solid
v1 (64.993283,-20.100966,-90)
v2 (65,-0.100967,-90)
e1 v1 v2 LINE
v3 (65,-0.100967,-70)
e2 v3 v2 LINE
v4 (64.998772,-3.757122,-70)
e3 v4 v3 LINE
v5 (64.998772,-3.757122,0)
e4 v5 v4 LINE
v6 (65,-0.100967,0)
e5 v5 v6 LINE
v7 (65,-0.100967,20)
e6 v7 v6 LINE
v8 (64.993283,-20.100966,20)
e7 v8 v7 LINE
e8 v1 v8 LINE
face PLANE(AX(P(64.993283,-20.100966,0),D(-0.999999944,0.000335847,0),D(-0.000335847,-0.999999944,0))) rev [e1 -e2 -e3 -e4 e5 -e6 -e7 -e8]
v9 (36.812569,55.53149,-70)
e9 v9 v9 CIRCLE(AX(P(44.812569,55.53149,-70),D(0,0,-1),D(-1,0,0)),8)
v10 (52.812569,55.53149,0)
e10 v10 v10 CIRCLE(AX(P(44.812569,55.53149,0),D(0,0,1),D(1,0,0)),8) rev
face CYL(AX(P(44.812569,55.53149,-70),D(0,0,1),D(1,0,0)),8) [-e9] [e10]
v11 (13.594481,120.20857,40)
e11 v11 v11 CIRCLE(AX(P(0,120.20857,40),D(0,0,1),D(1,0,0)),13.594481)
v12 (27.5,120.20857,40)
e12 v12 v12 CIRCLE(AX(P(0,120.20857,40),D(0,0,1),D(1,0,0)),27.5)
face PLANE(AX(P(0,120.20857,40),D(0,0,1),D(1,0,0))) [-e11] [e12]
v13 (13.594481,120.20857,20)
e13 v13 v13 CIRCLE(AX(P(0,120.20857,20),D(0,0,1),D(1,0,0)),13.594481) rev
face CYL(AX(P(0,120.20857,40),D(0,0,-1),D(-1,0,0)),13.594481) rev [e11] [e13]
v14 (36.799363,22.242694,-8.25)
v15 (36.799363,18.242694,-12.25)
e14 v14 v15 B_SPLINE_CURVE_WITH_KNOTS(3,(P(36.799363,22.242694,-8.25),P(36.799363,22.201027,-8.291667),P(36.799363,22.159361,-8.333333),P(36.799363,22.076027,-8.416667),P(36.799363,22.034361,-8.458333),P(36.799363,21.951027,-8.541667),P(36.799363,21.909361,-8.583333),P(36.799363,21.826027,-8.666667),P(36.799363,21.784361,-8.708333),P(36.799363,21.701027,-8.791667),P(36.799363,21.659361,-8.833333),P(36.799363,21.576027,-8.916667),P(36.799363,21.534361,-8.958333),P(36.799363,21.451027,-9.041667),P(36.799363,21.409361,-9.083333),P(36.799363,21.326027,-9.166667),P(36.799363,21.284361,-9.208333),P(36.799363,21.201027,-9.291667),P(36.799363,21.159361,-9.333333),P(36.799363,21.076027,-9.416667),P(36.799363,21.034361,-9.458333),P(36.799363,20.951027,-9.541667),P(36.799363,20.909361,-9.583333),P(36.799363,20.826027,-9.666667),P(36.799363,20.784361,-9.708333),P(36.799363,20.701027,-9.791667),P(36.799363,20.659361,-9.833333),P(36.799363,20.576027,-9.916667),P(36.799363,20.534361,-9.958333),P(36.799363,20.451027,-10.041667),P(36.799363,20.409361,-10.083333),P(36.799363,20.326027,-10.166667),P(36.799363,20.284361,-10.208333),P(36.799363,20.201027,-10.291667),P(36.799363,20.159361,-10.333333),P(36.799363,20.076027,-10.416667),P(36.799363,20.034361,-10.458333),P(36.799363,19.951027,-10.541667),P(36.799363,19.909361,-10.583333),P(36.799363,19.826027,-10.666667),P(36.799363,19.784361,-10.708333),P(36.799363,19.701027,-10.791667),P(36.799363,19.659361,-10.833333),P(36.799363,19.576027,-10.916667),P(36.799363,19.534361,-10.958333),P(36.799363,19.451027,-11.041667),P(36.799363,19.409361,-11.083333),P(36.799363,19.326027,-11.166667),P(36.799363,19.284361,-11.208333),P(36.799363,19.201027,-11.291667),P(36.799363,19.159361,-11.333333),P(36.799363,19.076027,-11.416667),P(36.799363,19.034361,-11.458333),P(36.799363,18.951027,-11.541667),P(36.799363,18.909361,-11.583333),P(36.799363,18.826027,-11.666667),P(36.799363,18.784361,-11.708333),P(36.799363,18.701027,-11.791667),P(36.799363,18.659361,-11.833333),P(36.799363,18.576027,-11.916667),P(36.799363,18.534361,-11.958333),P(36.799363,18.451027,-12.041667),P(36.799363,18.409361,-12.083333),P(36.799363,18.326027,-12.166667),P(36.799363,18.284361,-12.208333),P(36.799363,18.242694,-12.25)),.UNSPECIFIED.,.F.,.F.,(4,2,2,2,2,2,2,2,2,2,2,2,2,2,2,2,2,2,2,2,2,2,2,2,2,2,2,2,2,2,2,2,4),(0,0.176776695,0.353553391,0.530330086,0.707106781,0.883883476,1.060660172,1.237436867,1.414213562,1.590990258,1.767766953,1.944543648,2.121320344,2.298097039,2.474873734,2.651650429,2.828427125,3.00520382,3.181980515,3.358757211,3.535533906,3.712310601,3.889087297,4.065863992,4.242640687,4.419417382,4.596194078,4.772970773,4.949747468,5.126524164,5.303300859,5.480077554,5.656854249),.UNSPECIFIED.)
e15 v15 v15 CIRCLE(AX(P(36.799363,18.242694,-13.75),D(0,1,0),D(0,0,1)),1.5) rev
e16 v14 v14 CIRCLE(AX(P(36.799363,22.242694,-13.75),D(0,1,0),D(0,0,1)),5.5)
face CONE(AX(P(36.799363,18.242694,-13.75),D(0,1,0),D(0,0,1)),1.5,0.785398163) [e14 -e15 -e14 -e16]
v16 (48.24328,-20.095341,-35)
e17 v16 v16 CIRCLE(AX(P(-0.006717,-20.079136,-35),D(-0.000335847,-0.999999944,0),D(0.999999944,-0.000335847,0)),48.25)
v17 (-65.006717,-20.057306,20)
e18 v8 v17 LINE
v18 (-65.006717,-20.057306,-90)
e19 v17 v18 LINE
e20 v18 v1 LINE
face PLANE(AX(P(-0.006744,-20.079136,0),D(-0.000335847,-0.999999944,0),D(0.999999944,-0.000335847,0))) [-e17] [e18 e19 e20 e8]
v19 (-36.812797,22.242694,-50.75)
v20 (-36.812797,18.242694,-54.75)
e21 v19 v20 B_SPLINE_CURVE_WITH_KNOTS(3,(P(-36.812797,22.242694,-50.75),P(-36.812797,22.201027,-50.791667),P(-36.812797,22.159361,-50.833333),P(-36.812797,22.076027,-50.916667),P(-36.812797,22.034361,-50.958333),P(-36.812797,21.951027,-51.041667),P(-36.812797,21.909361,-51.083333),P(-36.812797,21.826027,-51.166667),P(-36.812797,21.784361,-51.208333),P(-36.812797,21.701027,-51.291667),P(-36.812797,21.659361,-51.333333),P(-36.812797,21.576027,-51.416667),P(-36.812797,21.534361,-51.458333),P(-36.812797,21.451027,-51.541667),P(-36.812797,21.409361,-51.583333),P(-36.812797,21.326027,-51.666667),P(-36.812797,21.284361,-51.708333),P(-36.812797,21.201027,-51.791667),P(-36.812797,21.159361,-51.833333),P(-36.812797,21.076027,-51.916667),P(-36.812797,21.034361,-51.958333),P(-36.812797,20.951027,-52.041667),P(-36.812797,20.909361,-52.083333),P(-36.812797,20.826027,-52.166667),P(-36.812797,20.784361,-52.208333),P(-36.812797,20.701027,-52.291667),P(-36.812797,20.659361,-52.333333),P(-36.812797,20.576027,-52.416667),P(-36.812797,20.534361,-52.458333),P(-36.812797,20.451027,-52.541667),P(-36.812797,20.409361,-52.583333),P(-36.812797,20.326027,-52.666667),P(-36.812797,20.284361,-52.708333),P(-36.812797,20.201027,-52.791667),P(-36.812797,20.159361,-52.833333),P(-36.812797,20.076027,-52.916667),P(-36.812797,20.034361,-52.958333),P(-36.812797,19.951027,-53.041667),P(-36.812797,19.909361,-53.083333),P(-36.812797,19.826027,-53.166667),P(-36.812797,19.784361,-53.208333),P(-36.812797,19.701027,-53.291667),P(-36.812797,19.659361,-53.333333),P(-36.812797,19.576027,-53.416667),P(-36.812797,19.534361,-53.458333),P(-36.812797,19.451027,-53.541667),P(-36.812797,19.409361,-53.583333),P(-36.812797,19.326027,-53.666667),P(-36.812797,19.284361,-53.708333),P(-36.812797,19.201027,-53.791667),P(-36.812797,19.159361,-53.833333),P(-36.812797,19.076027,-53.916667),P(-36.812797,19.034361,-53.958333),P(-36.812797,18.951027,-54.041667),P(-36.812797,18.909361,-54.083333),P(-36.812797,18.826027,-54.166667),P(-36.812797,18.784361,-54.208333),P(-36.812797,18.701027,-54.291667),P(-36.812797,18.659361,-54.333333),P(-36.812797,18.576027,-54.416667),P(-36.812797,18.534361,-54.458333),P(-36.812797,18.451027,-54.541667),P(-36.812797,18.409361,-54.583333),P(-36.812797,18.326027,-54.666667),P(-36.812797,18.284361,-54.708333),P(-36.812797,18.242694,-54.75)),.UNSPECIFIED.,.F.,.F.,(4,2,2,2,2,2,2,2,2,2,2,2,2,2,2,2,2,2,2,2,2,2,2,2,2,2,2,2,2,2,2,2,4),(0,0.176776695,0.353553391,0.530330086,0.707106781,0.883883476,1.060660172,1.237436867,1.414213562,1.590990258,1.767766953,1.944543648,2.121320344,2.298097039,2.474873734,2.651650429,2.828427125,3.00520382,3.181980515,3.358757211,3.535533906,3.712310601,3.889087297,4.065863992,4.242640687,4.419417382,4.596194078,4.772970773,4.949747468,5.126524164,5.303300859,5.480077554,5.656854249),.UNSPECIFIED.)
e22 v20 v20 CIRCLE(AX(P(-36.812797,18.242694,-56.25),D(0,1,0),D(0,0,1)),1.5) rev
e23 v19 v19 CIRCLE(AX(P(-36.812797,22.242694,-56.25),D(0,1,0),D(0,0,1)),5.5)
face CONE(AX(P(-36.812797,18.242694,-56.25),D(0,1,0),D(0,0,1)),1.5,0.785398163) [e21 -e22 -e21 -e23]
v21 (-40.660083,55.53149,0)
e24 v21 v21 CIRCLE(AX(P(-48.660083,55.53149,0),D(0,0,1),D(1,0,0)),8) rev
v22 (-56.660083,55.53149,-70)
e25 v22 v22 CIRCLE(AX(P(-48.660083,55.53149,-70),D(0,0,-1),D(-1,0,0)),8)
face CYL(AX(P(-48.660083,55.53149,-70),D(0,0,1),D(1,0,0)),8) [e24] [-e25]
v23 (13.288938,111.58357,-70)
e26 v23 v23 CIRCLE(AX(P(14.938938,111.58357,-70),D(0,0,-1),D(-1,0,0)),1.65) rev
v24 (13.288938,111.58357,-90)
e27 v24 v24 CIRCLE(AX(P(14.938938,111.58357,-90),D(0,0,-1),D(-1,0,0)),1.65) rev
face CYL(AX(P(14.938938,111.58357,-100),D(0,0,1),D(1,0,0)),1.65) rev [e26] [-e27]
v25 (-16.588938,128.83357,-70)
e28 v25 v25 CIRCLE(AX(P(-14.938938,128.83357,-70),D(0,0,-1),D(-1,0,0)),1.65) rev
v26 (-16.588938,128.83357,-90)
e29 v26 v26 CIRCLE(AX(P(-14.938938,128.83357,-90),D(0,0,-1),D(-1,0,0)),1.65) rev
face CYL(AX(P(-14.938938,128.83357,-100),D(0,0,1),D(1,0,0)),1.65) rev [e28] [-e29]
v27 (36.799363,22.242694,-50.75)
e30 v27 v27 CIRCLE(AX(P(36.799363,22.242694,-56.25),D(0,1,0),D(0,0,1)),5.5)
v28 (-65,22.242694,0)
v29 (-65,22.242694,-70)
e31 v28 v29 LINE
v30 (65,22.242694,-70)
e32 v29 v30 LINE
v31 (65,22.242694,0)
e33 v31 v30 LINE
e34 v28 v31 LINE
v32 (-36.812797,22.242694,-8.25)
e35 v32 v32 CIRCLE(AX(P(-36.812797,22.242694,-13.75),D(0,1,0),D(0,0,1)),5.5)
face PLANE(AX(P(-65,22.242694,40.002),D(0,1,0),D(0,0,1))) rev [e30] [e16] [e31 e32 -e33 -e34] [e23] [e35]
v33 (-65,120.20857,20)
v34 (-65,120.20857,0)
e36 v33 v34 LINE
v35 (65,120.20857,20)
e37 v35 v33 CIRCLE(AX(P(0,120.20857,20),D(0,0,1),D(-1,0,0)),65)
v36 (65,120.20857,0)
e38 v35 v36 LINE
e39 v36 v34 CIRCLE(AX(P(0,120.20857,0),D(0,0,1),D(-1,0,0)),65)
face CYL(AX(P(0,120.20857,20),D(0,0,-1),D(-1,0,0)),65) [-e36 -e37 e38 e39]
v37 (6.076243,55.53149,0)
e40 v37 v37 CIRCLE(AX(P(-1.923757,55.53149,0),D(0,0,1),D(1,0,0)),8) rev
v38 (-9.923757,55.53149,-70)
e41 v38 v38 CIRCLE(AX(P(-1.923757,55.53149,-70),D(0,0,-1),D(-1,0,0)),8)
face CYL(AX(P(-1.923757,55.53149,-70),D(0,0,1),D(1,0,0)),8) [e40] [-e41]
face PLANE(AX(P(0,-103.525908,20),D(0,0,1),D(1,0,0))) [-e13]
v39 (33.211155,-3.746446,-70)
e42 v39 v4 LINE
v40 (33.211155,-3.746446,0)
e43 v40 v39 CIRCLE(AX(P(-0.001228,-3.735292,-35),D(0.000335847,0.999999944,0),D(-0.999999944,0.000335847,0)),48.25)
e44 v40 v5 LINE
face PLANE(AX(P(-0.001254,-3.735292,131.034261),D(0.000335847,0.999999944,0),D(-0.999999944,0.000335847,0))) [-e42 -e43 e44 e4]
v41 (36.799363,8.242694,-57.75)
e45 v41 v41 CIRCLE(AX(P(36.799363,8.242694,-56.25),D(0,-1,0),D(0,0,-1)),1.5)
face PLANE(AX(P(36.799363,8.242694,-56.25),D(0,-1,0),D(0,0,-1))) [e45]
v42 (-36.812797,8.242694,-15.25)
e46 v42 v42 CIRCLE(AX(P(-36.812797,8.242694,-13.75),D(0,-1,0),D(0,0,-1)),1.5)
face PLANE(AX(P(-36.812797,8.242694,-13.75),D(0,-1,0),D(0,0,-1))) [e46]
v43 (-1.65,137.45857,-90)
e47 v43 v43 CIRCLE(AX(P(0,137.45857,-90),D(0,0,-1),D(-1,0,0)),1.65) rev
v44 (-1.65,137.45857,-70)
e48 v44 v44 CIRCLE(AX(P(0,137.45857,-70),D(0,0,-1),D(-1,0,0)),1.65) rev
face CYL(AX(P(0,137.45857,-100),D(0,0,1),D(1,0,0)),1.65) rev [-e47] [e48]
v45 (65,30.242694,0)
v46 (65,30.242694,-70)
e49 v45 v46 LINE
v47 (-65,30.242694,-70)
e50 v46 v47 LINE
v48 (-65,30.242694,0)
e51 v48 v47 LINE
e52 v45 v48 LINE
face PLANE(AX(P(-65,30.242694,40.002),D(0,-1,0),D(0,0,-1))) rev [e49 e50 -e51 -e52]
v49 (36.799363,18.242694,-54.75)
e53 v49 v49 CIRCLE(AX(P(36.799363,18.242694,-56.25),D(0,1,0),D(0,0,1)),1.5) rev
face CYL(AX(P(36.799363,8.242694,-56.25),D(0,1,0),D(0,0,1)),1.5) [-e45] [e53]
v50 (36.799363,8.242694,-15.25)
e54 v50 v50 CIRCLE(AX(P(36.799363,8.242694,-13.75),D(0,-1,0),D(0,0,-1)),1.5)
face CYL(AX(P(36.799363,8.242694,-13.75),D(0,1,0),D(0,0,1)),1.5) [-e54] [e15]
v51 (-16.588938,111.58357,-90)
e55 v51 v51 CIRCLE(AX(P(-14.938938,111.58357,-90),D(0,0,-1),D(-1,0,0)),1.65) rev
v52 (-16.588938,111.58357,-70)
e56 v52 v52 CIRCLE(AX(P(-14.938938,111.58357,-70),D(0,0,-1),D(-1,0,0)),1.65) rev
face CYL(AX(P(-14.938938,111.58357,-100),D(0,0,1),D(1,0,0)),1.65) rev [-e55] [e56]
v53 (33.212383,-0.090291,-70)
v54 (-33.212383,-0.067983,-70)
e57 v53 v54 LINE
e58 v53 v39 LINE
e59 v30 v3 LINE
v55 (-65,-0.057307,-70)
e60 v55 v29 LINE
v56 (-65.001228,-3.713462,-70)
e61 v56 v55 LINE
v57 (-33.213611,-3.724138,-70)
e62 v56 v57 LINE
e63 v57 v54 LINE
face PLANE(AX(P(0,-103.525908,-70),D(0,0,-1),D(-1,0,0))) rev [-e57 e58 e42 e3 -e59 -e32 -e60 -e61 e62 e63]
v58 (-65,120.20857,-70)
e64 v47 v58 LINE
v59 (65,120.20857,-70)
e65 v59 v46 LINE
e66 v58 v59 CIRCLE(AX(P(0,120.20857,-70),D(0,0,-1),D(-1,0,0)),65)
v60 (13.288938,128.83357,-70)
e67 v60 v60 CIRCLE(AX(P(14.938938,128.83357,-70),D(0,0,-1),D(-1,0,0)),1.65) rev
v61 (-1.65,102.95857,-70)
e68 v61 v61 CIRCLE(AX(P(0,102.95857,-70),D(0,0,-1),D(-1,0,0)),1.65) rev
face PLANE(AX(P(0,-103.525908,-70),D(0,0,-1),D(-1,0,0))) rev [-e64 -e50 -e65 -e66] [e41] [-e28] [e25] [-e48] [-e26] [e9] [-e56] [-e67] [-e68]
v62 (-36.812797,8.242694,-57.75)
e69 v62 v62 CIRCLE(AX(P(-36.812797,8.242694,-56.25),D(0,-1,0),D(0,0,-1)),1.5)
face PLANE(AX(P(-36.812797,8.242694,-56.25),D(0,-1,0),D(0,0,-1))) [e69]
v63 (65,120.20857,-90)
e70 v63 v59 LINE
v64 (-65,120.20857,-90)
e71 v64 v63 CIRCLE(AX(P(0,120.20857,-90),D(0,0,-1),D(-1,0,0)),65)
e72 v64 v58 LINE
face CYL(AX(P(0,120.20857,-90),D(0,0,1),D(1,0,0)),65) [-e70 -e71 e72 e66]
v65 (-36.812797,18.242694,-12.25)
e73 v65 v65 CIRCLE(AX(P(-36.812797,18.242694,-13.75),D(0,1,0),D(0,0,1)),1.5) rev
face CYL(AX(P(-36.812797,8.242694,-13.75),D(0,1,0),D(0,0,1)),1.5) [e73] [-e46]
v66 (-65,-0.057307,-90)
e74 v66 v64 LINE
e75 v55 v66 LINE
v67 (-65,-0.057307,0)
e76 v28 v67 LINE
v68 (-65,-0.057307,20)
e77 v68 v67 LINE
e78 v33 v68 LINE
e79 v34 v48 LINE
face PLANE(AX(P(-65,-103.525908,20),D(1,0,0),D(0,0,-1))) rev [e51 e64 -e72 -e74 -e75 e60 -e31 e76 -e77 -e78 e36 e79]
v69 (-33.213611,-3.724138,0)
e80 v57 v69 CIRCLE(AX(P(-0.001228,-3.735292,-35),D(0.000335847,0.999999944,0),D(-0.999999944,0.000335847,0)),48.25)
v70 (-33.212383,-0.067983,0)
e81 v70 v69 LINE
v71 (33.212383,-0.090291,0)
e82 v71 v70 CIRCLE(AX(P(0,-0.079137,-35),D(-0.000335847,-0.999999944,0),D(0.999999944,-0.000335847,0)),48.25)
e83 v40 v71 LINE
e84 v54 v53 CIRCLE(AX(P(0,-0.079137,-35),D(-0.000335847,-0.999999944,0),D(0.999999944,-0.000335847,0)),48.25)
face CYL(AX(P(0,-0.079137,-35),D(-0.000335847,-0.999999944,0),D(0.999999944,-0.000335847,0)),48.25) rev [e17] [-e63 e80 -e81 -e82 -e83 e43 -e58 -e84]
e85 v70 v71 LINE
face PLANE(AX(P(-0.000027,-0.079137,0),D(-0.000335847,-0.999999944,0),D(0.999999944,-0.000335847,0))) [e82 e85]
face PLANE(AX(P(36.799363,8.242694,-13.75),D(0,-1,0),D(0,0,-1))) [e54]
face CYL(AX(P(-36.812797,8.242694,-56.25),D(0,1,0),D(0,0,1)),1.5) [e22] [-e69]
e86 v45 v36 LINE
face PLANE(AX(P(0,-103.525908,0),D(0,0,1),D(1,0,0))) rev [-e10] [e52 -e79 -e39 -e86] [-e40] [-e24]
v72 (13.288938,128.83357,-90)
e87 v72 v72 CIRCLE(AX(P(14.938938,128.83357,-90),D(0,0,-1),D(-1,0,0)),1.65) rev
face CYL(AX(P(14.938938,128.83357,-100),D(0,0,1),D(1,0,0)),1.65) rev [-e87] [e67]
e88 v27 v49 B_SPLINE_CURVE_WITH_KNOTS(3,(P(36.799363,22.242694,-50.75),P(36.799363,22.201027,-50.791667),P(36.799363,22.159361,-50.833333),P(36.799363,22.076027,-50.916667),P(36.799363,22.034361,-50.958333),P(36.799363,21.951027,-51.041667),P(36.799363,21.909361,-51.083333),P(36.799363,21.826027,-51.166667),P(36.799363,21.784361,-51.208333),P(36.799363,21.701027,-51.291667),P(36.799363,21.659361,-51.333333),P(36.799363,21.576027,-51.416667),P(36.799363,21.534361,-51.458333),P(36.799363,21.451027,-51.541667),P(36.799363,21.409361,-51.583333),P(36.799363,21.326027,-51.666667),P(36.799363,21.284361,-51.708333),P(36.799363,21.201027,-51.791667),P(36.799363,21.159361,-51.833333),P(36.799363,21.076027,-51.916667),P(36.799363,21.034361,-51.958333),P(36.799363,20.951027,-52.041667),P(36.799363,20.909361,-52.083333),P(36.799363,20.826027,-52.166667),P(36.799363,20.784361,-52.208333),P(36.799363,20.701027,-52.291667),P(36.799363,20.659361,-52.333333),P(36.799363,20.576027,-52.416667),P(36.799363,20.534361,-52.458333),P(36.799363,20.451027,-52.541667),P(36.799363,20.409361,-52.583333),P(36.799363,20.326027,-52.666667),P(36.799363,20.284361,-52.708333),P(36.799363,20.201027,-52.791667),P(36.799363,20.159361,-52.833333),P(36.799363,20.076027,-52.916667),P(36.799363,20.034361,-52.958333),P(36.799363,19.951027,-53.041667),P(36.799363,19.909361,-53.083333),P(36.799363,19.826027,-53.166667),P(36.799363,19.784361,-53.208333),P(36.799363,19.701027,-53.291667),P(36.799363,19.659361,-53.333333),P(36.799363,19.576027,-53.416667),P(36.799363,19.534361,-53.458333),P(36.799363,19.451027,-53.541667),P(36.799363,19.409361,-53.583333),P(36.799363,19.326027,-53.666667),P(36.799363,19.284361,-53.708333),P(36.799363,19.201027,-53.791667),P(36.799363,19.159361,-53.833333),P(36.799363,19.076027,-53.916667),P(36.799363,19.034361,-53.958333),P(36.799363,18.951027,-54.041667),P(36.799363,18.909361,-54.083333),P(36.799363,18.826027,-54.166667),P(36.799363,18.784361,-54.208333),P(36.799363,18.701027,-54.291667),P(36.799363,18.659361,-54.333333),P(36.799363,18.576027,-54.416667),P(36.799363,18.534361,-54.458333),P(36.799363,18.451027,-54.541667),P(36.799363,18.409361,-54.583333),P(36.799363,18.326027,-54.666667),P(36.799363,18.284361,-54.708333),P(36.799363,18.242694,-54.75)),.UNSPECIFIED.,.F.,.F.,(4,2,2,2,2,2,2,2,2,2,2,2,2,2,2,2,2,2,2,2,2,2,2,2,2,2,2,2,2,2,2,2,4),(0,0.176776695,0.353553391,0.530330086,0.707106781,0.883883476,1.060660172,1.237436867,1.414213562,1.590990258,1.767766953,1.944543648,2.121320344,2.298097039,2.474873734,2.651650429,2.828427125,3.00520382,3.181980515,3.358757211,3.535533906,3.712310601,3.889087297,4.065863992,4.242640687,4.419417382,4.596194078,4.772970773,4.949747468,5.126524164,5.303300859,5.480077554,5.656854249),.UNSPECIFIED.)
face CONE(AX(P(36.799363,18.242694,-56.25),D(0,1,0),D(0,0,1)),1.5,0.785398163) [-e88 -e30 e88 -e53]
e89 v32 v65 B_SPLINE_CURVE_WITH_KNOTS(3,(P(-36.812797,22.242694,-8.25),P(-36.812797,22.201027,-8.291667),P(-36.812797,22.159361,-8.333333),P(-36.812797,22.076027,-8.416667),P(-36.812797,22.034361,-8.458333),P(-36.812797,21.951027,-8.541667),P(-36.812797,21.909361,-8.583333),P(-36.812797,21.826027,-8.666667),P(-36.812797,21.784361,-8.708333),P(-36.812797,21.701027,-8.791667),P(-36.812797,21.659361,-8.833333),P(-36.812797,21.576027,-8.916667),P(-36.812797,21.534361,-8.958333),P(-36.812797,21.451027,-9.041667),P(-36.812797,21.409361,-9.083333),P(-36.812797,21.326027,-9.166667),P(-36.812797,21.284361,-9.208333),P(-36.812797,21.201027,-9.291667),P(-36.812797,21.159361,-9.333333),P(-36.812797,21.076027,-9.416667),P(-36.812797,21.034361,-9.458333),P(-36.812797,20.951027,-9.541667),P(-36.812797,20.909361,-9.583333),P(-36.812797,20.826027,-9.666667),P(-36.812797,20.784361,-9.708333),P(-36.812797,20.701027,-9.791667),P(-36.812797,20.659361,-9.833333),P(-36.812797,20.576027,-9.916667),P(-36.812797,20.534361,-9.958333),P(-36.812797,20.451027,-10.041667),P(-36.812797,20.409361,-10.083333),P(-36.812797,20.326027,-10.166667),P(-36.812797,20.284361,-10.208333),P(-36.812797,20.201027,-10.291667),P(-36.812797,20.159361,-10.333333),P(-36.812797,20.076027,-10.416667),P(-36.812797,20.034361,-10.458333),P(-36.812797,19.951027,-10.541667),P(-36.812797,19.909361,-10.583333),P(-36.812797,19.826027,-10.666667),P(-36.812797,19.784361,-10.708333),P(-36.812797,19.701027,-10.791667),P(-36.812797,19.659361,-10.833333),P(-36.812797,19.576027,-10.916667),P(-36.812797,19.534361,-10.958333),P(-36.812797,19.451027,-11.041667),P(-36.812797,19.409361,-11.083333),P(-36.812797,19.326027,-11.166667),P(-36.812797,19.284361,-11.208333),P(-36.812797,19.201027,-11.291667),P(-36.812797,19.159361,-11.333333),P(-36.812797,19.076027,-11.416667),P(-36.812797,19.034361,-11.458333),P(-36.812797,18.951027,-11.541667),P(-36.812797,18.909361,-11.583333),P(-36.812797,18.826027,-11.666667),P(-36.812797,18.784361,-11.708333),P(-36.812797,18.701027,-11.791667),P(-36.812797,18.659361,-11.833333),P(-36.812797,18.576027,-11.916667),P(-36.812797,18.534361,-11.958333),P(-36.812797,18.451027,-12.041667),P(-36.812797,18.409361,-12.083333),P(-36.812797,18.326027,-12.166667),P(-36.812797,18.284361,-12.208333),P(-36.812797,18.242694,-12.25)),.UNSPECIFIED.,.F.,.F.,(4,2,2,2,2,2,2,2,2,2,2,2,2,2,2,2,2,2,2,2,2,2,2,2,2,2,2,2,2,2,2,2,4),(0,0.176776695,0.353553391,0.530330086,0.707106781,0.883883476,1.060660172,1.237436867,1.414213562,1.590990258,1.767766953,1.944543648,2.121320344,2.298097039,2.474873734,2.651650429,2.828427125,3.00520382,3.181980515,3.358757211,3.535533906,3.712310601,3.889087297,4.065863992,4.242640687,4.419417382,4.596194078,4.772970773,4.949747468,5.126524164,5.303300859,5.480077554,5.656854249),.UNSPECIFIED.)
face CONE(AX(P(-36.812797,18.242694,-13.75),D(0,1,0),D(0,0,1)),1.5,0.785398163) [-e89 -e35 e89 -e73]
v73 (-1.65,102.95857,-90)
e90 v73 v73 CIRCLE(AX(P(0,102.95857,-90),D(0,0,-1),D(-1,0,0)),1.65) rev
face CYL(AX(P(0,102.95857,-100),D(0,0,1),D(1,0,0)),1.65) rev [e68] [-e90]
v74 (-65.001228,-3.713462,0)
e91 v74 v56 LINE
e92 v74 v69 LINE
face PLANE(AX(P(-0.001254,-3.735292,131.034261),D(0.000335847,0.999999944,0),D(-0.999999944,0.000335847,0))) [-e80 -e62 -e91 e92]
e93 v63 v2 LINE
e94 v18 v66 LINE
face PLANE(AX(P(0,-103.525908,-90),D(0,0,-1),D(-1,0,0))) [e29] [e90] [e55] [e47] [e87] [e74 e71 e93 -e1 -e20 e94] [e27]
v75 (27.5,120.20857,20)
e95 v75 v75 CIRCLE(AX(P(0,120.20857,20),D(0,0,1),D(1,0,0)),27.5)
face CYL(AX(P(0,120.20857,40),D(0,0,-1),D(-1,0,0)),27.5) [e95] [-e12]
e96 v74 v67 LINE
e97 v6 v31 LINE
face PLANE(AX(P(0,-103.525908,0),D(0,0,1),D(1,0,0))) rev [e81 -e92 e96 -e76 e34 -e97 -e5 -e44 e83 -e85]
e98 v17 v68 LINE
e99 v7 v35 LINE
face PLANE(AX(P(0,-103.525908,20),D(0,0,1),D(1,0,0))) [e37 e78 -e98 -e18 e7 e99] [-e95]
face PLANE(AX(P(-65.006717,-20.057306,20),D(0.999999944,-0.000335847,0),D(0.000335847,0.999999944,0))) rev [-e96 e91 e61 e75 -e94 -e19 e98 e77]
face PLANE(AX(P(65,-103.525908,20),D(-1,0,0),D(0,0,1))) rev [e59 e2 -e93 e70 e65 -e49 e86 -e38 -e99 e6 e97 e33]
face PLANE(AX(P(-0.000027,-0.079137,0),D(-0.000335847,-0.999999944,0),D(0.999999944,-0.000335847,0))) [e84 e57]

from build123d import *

# Parameters (mm, degrees)
SKETCH_1_R                      = 48.25
EXTRUDE_1_DEPTH                 = 20
SKETCH_2_R                      = 8
EXTRUDE_2_DEPTH                 = 70
EXTRUDE_START                   = 20
SKETCH_3_R                      = 48.25
EXTRUDE_3_DEPTH                 = 20
EXTRUDE_4_DEPTH                 = 149
EXTRUDE_START_2                 = -120.265870341
EXTRUDE_4_2_OUTLINE_W           = 1.999969756
EXTRUDE_4_2_OUTLINE_H           = 20
EXTRUDE_4_2_DEPTH               = 140.265870341
EXTRUDE_4_3_OUTLINE_W           = 130.000007332
EXTRUDE_4_3_OUTLINE_H           = 20
EXTRUDE_4_3_DEPTH               = 20
EXTRUDE_6_DEPTH                 = 70
CUT_EXTRUDE_3_DEPTH             = 20
EXTRUDE_START_3                 = -20
SKETCH_8_R                      = 48.25
EXTRUDE_7_DEPTH                 = 20
SKETCH_9_R                      = 48.25
EXTRUDE_8_DEPTH                 = 20
SKETCH_10_R                     = 1.65
EXTRUDE_9_DEPTH                 = 10
EXTRUDE_START_4                 = 10
SKETCH_11_R                     = 1.65
EXTRUDE_10_DEPTH                = 10
SKETCH_14_R                     = 27.5
SKETCH_14_R_2                   = 13.594481218
EXTRUDE_12_DEPTH                = 20
CUT_EXTRUDE_4_REACH             = 237.432
SKETCH_15_R                     = 1.65
CUT_EXTRUDE_4_DIRECTION_2_DEPTH = 236.431704876
EXTRUDE_13_REACH                = 227.007
SKETCH_16_W                     = 130
SKETCH_16_H                     = 8
CUT_EXTRUDE_START               = 70
SKETCH_17_R                     = 8
CUT_EXTRUDE_5_DEPTH             = 70
SKETCH_18_R                     = 1.5
EXTRUDE_14_DEPTH                = 14
CHAMFER_1_SIZE                  = 4


with BuildPart() as part:
    # 草图1 → 凸台-拉伸1 (new body)
    with BuildSketch(Plane.XY):
        with BuildLine():
            Line((-65, -103.52590801), (-65, 120.208570031))
            ThreePointArc((-65, 120.208570031), (0, 185.208570031), (65, 120.208570031))
            Line((65, 120.208570031), (65, -103.52590801))
            ThreePointArc((65, -103.52590801), (0, -168.52590801), (-65, -103.52590801))
        make_face()
        with Locations((0, 120.208570031)):
            Circle(SKETCH_1_R, mode=Mode.SUBTRACT)
        with Locations(Location((0, -103.52590801, 0), (0, 0, 180))):
            Circle(SKETCH_1_R, mode=Mode.SUBTRACT)
    extrude(amount=EXTRUDE_1_DEPTH)

    # 草图2 → 凸台-拉伸2 (add)
    with BuildSketch(Plane(origin=(0, 0, 0), x_dir=(-1, 0, 0), z_dir=(0, 0, -1))):
        with Locations(Location((-44.812568829, 55.531490167, 0), (0, 0, 180))):
            Circle(SKETCH_2_R)
        with Locations(Location((-44.812568829, -39.65707978, 0), (0, 0, 180))):
            Circle(SKETCH_2_R)
        with Locations(Location((48.660082913, -39.65707978, 0), (0, 0, 180))):
            Circle(SKETCH_2_R)
        with Locations(Location((48.660082913, 55.531490167, 0), (0, 0, 180))):
            Circle(SKETCH_2_R)
        with Locations(Location((1.923757042, 55.531490167, 0), (0, 0, 180))):
            Circle(SKETCH_2_R)
        with Locations(Location((1.923757042, -39.65707978, 0), (0, 0, 180))):
            Circle(SKETCH_2_R)
        with Locations(Location((-44.812568829, 7.937205194, 0), (0, 0, 180))):
            Circle(SKETCH_2_R)
        with Locations(Location((48.660082913, 7.937205194, 0), (0, 0, 180))):
            Circle(SKETCH_2_R)
    extrude(amount=EXTRUDE_2_DEPTH)

    # 草图3 → 凸台-拉伸3 (add)
    with BuildSketch(Plane(origin=(0, 0, -70), x_dir=(-1, 0, 0), z_dir=(0, 0, -1)).offset(EXTRUDE_START)):
        with BuildLine():
            Line((65, -103.52590801), (65, 120.208570031))
            ThreePointArc((65, 120.208570031), (0, 185.208570031), (-65, 120.208570031))
            Line((-65, 120.208570031), (-65, -103.52590801))
            ThreePointArc((-65, -103.52590801), (0, -168.52590801), (65, -103.52590801))
        make_face()
        with Locations(Location((0, 120.208570031, 0), (0, 0, 180))):
            Circle(SKETCH_3_R, mode=Mode.SUBTRACT)
        with Locations((0, -103.52590801)):
            Circle(SKETCH_3_R, mode=Mode.SUBTRACT)
    extrude(amount=-EXTRUDE_3_DEPTH)

    # 凸台-拉伸4: read off the stored shape, not the designer's step
    # 凸台-拉伸4 outline → 凸台-拉伸4 (cut)
    with BuildSketch(Plane(origin=(-2.6578e-05, -0.079137147, 0), x_dir=(0.9999999436033571, -0.0003358471121103656, 0), z_dir=(-0.0003358471121103656, -0.9999999436033572, 0)).offset(EXTRUDE_START)):
        Polygon((-64.999977088, 20), (-64.999977088, -90), (67, -90), (67, -70), (65.000030244, -70), (65.000030244, 0), (67, 0), (67, 20), align=None)
    extrude(amount=EXTRUDE_4_DEPTH, mode=Mode.SUBTRACT)

    # Extrude 4 2 outline → Extrude 4 2 (cut)
    with BuildSketch(Plane(origin=(-2.6578e-05, -0.079137147, 0), x_dir=(0.9999999436033571, -0.0003358471121103656, 0), z_dir=(-0.0003358471121103656, -0.9999999436033572, 0)).offset(EXTRUDE_START_2)):
        with Locations((66.000015122, 10)):
            Rectangle(EXTRUDE_4_2_OUTLINE_W, EXTRUDE_4_2_OUTLINE_H)
        with Locations((66.000015122, -80)):
            Rectangle(EXTRUDE_4_2_OUTLINE_W, EXTRUDE_4_2_OUTLINE_H)
    extrude(amount=EXTRUDE_4_2_DEPTH, mode=Mode.SUBTRACT)

    # Extrude 4 3 outline → Extrude 4 3 (add)
    with BuildSketch(Plane(origin=(-2.6578e-05, -0.079137147, 0), x_dir=(0.9999999436033571, -0.0003358471121103656, 0), z_dir=(-0.0003358471121103656, -0.9999999436033572, 0))):
        with Locations((2.6578e-05, 10)):
            Rectangle(EXTRUDE_4_3_OUTLINE_W, EXTRUDE_4_3_OUTLINE_H)
        with Locations((2.6578e-05, -80)):
            Rectangle(EXTRUDE_4_3_OUTLINE_W, EXTRUDE_4_3_OUTLINE_H)
    extrude(amount=EXTRUDE_4_3_DEPTH)

    # 草图6 → 凸台-拉伸6 (add)
    with BuildSketch(Plane.XY.offset(-70)):
        Polygon((64.998772091, -3.757122016), (-65.001227909, -3.713461889), (-65.006716942, -20.057305964), (64.993283058, -20.100966091), align=None)
    extrude(amount=EXTRUDE_6_DEPTH)

    # 草图7 → 切除-拉伸3 (cut)
    with BuildSketch(Plane(origin=(-0.00674352, -20.079136019, 0), x_dir=(0.9999999436033571, -0.00033584711211036565, 0), z_dir=(-0.00033584711211036565, -0.9999999436033572, 0))):
        with BuildLine():
            ThreePointArc((2.6578e-05, 13.25), (-34.117875614, -0.882097808), (-48.249973422, -35))
            Line((-48.249973422, -35), (2.6578e-05, -35))
            Line((2.6578e-05, -35), (2.6578e-05, 13.25))
        make_face()
        with BuildLine():
            Line((2.6578e-05, -35), (-48.249973422, -35))
            ThreePointArc((-48.249973422, -35), (-34.117875614, -69.117902192), (2.6578e-05, -83.25))
            Line((2.6578e-05, -83.25), (2.6578e-05, -35))
        make_face()
        with BuildLine():
            Line((2.6578e-05, 13.25), (2.6578e-05, -35))
            Line((2.6578e-05, -35), (48.250026578, -35))
            ThreePointArc((48.250026578, -35), (34.11792877, -0.882097808), (2.6578e-05, 13.25))
        make_face()
        with BuildLine():
            Line((48.250026578, -35), (2.6578e-05, -35))
            Line((2.6578e-05, -35), (2.6578e-05, -83.25))
            ThreePointArc((2.6578e-05, -83.25), (34.11792877, -69.117902192), (48.250026578, -35))
        make_face()
    extrude(amount=-CUT_EXTRUDE_3_DEPTH, mode=Mode.SUBTRACT)

    # 草图8 → 凸台-拉伸7 (add)
    with BuildSketch(Plane.XY.offset(20).offset(EXTRUDE_START_3)):
        with Locations(Location((0, 120.208570031, 0), (0, 0, 180))):
            Circle(SKETCH_8_R)
    extrude(amount=EXTRUDE_7_DEPTH)

    # 草图9 → 凸台-拉伸8 (add)
    with BuildSketch(Plane(origin=(0, 0, -90), x_dir=(-1, 0, 0), z_dir=(0, 0, -1))):
        with Locations((0, 120.208570031)):
            Circle(SKETCH_9_R)
    extrude(amount=-EXTRUDE_8_DEPTH)

    # 草图10 → 凸台-拉伸9 (add)
    with BuildSketch(Plane(origin=(0, 0, -90), x_dir=(-1, 0, 0), z_dir=(0, 0, -1))):
        with Locations((0, 137.458570031)):
            Circle(SKETCH_10_R)
        with Locations((14.938938215, 128.833570031)):
            Circle(SKETCH_10_R)
        with Locations((14.938938215, 111.583570031)):
            Circle(SKETCH_10_R)
        with Locations((0, 102.958570031)):
            Circle(SKETCH_10_R)
        with Locations((-14.938938215, 111.583570031)):
            Circle(SKETCH_10_R)
        with Locations((-14.938938215, 128.833570031)):
            Circle(SKETCH_10_R)
    extrude(amount=EXTRUDE_9_DEPTH)

    # 草图11 → 凸台-拉伸10 (add)
    with BuildSketch(Plane.XY.offset(20).offset(EXTRUDE_START_4)):
        with Locations(Location((0, 102.958570031, 0), (0, 0, 180))):
            Circle(SKETCH_11_R)
        with Locations(Location((14.938938215, 111.583570031, 0), (0, 0, 180))):
            Circle(SKETCH_11_R)
        with Locations(Location((14.938938215, 128.833570031, 0), (0, 0, 180))):
            Circle(SKETCH_11_R)
        with Locations(Location((0, 137.458570031, 0), (0, 0, 180))):
            Circle(SKETCH_11_R)
        with Locations(Location((-14.938938215, 128.833570031, 0), (0, 0, 180))):
            Circle(SKETCH_11_R)
        with Locations(Location((-14.938938215, 111.583570031, 0), (0, 0, 180))):
            Circle(SKETCH_11_R)
    extrude(amount=-EXTRUDE_10_DEPTH)

    # 草图14 → 凸台-拉伸12 (add)
    with BuildSketch(Plane.XY.offset(20)):
        with Locations((0, 120.208570031)):
            Circle(SKETCH_14_R)
        with Locations((0, 120.208570031)):
            Circle(SKETCH_14_R_2, mode=Mode.SUBTRACT)
    extrude(amount=EXTRUDE_12_DEPTH)

    # 草图15 → 切除-拉伸4 (cut, up to next)
    with BuildSketch(Plane(origin=(0, 0, -90), x_dir=(-1, 0, 0), z_dir=(0, 0, -1)), mode=Mode.PRIVATE) as cut_extrude_4_sk1:
        with Locations((0, 102.958570031)):
            Circle(SKETCH_15_R)
    cut_extrude_4_tool1 = extrude(cut_extrude_4_sk1.sketch, amount=-CUT_EXTRUDE_4_REACH, mode=Mode.PRIVATE) & part.part
    # 草图15 → 切除-拉伸4 (cut, up to next)
    with BuildSketch(Plane(origin=(0, 0, -90), x_dir=(-1, 0, 0), z_dir=(0, 0, -1)), mode=Mode.PRIVATE) as cut_extrude_4_sk2:
        with Locations((-14.938938215, 111.583570031)):
            Circle(SKETCH_15_R)
    cut_extrude_4_tool2 = extrude(cut_extrude_4_sk2.sketch, amount=-CUT_EXTRUDE_4_REACH, mode=Mode.PRIVATE) & part.part
    # 草图15 → 切除-拉伸4 (cut, up to next)
    with BuildSketch(Plane(origin=(0, 0, -90), x_dir=(-1, 0, 0), z_dir=(0, 0, -1)), mode=Mode.PRIVATE) as cut_extrude_4_sk3:
        with Locations((-14.938938215, 128.833570031)):
            Circle(SKETCH_15_R)
    cut_extrude_4_tool3 = extrude(cut_extrude_4_sk3.sketch, amount=-CUT_EXTRUDE_4_REACH, mode=Mode.PRIVATE) & part.part
    # 草图15 → 切除-拉伸4 (cut, up to next)
    with BuildSketch(Plane(origin=(0, 0, -90), x_dir=(-1, 0, 0), z_dir=(0, 0, -1)), mode=Mode.PRIVATE) as cut_extrude_4_sk4:
        with Locations((0, 137.458570031)):
            Circle(SKETCH_15_R)
    cut_extrude_4_tool4 = extrude(cut_extrude_4_sk4.sketch, amount=-CUT_EXTRUDE_4_REACH, mode=Mode.PRIVATE) & part.part
    # 草图15 → 切除-拉伸4 (cut, up to next)
    with BuildSketch(Plane(origin=(0, 0, -90), x_dir=(-1, 0, 0), z_dir=(0, 0, -1)), mode=Mode.PRIVATE) as cut_extrude_4_sk5:
        with Locations((14.938938215, 128.833570031)):
            Circle(SKETCH_15_R)
    cut_extrude_4_tool5 = extrude(cut_extrude_4_sk5.sketch, amount=-CUT_EXTRUDE_4_REACH, mode=Mode.PRIVATE) & part.part
    # 草图15 → 切除-拉伸4 (cut, up to next)
    with BuildSketch(Plane(origin=(0, 0, -90), x_dir=(-1, 0, 0), z_dir=(0, 0, -1)), mode=Mode.PRIVATE) as cut_extrude_4_sk6:
        with Locations((14.938938215, 111.583570031)):
            Circle(SKETCH_15_R)
    cut_extrude_4_tool6 = extrude(cut_extrude_4_sk6.sketch, amount=-CUT_EXTRUDE_4_REACH, mode=Mode.PRIVATE) & part.part
    add(cut_extrude_4_tool1.solids().sort_by_distance((0, 102.95857, -90))[0], mode=Mode.SUBTRACT)
    add(cut_extrude_4_tool2.solids().sort_by_distance((14.938938, 111.58357, -90))[0], mode=Mode.SUBTRACT)
    add(cut_extrude_4_tool3.solids().sort_by_distance((14.938938, 128.83357, -90))[0], mode=Mode.SUBTRACT)
    add(cut_extrude_4_tool4.solids().sort_by_distance((0, 137.45857, -90))[0], mode=Mode.SUBTRACT)
    add(cut_extrude_4_tool5.solids().sort_by_distance((-14.938938, 128.83357, -90))[0], mode=Mode.SUBTRACT)
    add(cut_extrude_4_tool6.solids().sort_by_distance((-14.938938, 111.58357, -90))[0], mode=Mode.SUBTRACT)

    # 草图15 → 切除-拉伸4 direction 2 (cut)
    with BuildSketch(Plane(origin=(0, 0, -90), x_dir=(-1, 0, 0), z_dir=(0, 0, -1))):
        with Locations((0, 102.958570031)):
            Circle(SKETCH_15_R)
        with Locations((-14.938938215, 111.583570031)):
            Circle(SKETCH_15_R)
        with Locations((-14.938938215, 128.833570031)):
            Circle(SKETCH_15_R)
        with Locations((0, 137.458570031)):
            Circle(SKETCH_15_R)
        with Locations((14.938938215, 128.833570031)):
            Circle(SKETCH_15_R)
        with Locations((14.938938215, 111.583570031)):
            Circle(SKETCH_15_R)
    extrude(amount=CUT_EXTRUDE_4_DIRECTION_2_DEPTH, mode=Mode.SUBTRACT)

    # 草图16 → 凸台-拉伸13 (add, up to next)
    with BuildSketch(Plane.XY.offset(-70), mode=Mode.PRIVATE) as extrude_13_sk1:
        with Locations((0, 26.242694036)):
            Rectangle(SKETCH_16_W, SKETCH_16_H)
    extrude_13_tool1 = extrude(extrude_13_sk1.sketch, amount=EXTRUDE_13_REACH, mode=Mode.PRIVATE) - part.part
    add(extrude_13_tool1.solids().sort_by_distance((0, 26.242694, -70))[0])

    # 草图17 → 切除-拉伸5 (cut)
    with BuildSketch(Plane.XY.offset(-70).offset(CUT_EXTRUDE_START)):
        with Locations((44.812568829, 7.937205194)):
            Circle(SKETCH_17_R)
        with Locations((-48.660082913, 7.937205194)):
            Circle(SKETCH_17_R)
    extrude(amount=-CUT_EXTRUDE_5_DEPTH, mode=Mode.SUBTRACT)

    # 草图18 → 凸台-拉伸14 (add)
    with BuildSketch(Plane.XZ.offset(-22.242694036)):
        with Locations((-0.006716942, 7.5)):
            Circle(SKETCH_18_R)
        with Locations(Location((36.799362719, -13.75, 0), (0, 0, 90))):
            Circle(SKETCH_18_R)
        with Locations(Location((36.799362719, -56.25, 0), (0, 0, 90))):
            Circle(SKETCH_18_R)
        with Locations((-0.006716942, -77.5)):
            Circle(SKETCH_18_R)
        with Locations(Location((-36.812796603, -56.25, 0), (0, 0, 90))):
            Circle(SKETCH_18_R)
        with Locations(Location((-36.812796603, -13.75, 0), (0, 0, 90))):
            Circle(SKETCH_18_R)
    extrude(amount=EXTRUDE_14_DEPTH)

    # 倒角1
    chamfer_1_edges = [part.edges().sort_by_distance(p)[0] for p in [
        (36.799362719, 22.242694036, -15.25),
        (36.799362719, 22.242694036, -57.75),
        (-36.812796603, 22.242694036, -57.75),
        (-36.812796603, 22.242694036, -15.25),
    ]]
    chamfer(chamfer_1_edges, length=CHAMFER_1_SIZE)


solid = part.part
